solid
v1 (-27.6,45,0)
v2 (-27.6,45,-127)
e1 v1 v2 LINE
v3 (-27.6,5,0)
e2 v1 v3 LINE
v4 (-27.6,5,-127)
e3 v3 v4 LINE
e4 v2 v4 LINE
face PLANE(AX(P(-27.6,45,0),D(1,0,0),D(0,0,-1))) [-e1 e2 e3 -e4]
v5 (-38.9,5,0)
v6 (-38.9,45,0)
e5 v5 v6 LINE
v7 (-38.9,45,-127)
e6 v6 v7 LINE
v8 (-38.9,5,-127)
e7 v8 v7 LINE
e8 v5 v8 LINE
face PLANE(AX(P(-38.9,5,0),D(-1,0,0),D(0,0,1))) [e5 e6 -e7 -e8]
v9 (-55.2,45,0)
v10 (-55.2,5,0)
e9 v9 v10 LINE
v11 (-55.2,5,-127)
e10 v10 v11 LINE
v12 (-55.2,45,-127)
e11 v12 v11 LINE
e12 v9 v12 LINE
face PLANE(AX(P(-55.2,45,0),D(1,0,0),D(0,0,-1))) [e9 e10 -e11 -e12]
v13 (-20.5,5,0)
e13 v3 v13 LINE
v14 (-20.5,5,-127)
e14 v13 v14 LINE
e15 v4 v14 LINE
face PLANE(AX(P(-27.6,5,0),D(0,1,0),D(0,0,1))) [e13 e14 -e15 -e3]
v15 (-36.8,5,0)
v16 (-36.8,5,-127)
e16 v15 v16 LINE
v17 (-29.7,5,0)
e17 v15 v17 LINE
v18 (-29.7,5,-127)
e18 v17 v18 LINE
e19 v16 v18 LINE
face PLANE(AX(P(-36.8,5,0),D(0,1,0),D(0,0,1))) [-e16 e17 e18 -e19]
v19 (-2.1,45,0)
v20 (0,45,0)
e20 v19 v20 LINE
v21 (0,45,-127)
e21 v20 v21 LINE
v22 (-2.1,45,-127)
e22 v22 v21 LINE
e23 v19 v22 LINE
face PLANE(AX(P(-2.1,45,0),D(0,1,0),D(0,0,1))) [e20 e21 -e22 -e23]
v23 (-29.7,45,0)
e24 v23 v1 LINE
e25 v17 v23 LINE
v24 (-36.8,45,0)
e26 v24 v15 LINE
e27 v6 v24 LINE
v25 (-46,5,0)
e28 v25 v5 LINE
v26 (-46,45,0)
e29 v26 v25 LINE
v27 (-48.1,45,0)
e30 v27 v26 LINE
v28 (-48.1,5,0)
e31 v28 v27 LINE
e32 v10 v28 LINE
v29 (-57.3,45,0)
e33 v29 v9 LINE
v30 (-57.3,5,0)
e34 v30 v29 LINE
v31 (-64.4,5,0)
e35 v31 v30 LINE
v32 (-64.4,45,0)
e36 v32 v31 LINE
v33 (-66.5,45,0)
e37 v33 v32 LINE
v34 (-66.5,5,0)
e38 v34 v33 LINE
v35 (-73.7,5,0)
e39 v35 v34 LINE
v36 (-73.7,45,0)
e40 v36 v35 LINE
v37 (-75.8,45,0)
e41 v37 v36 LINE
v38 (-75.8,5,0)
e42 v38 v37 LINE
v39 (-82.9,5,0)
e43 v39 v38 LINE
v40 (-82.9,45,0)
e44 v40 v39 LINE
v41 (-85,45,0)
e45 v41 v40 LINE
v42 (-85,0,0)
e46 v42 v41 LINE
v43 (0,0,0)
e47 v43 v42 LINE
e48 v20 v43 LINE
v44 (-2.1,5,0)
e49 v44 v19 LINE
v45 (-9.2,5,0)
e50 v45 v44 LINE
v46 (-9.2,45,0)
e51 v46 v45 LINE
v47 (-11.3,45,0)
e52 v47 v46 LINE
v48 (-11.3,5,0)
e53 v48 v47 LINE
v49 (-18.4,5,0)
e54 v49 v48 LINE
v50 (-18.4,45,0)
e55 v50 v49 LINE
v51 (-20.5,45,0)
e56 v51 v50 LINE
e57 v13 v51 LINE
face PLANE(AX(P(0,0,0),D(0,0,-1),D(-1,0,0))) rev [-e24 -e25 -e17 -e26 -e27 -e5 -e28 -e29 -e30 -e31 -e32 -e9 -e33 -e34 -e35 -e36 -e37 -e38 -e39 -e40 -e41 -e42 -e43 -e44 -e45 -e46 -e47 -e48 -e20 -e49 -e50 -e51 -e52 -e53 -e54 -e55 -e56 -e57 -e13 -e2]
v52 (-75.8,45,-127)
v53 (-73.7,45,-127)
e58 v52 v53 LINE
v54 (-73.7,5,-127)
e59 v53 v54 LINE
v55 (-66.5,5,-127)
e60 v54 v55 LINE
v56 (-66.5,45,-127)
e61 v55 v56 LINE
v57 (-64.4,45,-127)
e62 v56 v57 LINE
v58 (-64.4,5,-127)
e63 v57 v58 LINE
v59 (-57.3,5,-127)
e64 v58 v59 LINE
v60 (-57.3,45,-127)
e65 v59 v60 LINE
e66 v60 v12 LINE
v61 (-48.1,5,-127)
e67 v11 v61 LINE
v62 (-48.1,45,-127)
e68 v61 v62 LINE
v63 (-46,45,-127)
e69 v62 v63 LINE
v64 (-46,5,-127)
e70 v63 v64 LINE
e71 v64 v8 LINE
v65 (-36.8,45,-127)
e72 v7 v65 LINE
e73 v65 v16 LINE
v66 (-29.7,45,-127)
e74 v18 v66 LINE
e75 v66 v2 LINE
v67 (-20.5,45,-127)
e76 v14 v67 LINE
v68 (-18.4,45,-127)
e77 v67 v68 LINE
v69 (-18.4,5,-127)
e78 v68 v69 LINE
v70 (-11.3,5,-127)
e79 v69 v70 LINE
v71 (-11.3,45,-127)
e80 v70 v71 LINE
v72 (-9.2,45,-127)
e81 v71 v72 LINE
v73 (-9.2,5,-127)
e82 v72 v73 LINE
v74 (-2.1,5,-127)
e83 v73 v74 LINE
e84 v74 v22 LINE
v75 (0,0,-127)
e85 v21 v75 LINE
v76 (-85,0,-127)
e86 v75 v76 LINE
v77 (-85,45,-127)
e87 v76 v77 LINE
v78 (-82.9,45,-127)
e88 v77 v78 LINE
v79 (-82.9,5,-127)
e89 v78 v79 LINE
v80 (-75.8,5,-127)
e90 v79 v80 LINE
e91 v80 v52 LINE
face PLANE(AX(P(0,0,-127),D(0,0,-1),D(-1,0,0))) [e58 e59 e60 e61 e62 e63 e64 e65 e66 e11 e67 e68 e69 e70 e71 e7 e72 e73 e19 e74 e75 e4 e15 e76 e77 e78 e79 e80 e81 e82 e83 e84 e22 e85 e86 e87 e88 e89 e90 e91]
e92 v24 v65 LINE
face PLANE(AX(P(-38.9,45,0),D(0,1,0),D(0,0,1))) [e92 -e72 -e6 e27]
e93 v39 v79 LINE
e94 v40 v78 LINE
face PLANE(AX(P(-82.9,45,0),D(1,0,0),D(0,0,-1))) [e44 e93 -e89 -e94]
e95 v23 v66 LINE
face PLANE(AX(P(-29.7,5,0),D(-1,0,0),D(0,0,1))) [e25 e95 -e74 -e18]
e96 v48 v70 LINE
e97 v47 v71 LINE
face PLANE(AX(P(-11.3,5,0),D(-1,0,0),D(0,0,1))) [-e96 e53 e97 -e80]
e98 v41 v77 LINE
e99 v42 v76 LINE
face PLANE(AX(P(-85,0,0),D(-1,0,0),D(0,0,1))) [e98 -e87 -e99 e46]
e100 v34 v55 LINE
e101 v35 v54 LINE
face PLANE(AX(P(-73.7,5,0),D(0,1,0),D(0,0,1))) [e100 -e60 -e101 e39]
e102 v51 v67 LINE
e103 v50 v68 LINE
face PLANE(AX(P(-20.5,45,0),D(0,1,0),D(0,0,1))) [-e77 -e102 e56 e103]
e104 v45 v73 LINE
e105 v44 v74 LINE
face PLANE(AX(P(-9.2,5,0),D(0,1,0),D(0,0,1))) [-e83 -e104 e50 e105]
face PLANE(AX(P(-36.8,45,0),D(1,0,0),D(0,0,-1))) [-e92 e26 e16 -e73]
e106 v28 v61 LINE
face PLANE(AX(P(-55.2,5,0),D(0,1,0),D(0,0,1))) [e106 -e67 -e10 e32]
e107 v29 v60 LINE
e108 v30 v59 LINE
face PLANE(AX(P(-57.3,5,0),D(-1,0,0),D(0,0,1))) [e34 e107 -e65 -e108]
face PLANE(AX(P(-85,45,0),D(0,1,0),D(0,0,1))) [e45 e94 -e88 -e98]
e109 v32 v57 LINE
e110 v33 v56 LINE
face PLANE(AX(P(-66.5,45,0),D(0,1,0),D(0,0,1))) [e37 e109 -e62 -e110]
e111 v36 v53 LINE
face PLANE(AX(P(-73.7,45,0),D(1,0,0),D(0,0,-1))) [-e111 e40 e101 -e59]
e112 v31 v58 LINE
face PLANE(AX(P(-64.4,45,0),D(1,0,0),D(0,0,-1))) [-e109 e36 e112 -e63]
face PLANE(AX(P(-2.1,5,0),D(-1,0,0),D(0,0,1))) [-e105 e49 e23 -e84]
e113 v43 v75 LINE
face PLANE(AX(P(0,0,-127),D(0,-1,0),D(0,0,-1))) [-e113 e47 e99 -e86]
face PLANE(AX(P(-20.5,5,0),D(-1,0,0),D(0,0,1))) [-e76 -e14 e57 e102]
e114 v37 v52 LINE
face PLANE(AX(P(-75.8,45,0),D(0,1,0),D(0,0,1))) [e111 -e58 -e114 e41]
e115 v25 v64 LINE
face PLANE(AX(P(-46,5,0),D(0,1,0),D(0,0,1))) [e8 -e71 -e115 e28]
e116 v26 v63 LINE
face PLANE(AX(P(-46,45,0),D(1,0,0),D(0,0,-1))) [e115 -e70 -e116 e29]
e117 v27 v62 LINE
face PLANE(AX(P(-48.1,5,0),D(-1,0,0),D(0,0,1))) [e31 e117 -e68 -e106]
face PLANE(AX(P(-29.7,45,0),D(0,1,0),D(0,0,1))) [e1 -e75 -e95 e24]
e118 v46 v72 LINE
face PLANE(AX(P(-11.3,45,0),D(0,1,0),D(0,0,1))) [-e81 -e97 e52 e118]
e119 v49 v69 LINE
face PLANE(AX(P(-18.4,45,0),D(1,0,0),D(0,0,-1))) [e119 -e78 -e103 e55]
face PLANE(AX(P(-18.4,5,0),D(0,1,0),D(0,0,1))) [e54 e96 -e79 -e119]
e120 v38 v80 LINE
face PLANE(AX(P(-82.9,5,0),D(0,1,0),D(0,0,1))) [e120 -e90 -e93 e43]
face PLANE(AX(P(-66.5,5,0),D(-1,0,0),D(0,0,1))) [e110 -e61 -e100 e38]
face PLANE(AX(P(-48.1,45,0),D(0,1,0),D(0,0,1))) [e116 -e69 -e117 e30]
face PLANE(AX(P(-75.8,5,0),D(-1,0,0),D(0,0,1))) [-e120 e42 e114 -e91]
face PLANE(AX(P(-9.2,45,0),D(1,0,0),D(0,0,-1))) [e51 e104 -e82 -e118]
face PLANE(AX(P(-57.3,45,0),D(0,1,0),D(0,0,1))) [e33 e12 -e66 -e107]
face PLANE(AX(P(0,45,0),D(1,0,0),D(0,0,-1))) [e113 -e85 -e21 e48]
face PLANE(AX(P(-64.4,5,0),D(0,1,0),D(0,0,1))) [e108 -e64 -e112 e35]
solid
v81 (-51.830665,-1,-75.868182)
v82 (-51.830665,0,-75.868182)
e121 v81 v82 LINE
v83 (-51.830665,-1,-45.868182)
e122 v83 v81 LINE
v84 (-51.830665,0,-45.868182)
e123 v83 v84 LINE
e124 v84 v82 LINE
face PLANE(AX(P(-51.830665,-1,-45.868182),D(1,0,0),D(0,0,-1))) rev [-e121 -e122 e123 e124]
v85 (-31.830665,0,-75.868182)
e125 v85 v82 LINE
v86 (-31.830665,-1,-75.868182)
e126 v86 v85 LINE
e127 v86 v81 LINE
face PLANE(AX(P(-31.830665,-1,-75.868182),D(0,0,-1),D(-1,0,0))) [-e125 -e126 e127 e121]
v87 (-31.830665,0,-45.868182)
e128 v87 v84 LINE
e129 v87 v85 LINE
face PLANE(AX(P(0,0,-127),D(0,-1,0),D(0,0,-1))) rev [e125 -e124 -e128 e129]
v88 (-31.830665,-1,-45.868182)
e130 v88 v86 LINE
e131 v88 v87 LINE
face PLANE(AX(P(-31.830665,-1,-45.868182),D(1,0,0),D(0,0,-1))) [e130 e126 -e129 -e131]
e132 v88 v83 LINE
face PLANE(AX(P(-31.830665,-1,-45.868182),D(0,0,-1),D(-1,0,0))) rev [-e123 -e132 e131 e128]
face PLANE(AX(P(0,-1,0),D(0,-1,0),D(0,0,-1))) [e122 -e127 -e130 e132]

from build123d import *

# Parameters (mm, degrees)
BOSS_EXTRUDE1_DEPTH = 127
SKETCH5_W           = 20
SKETCH5_H           = 30
BOSS_EXTRUDE4_DEPTH = 1


# Read off the part's stored shape, not the designer's step: Split2
with BuildPart() as part:
    # Sketch1 → Boss-Extrude1 (new body)
    with BuildSketch(Plane(origin=(0, 0, -127), x_dir=(-1, 0, 0), z_dir=(0, 0, -1))):
        Polygon((85, 45), (82.9, 45), (82.9, 5), (75.8, 5), (75.8, 45), (73.7, 45), (73.7, 5), (66.5, 5), (66.5, 45), (64.4, 45), (64.4, 5), (57.3, 5), (57.3, 45), (55.2, 45), (55.2, 5), (48.1, 5), (48.1, 45), (46, 45), (46, 5), (38.9, 5), (38.9, 45), (36.8, 45), (36.8, 5), (29.7, 5), (29.7, 45), (27.6, 45), (27.6, 5), (20.5, 5), (20.5, 45), (18.4, 45), (18.4, 5), (11.3, 5), (11.3, 45), (9.2, 45), (9.2, 5), (2.1, 5), (2.1, 45), (0, 45), (0, 0), (85, 0), align=None)
    extrude(amount=-BOSS_EXTRUDE1_DEPTH)

    # Sketch5 → Boss-Extrude4 (add)
    with BuildSketch(Plane(origin=(0, 0, 0), x_dir=(-1, 0, 0), z_dir=(0, -1, 0))):
        with Locations((41.830664792, 60.868181684)):
            Rectangle(SKETCH5_W, SKETCH5_H)
    extrude(amount=BOSS_EXTRUDE4_DEPTH)


with BuildPart() as body_2:
    # Split2: the piece on the far side of the plane
    add(part.part)
    split(bisect_by=Plane(origin=(0, 0, 0), x_dir=(1, 0, 0), z_dir=(0, 1, 0)), keep=Keep.BOTTOM)


with BuildPart() as part_1:
    add(part.part)

    # Split2
    split(bisect_by=Plane(origin=(0, 0, 0), x_dir=(1, 0, 0), z_dir=(0, 1, 0)), keep=Keep.TOP)


solid = Compound([body_2.part, part_1.part])
